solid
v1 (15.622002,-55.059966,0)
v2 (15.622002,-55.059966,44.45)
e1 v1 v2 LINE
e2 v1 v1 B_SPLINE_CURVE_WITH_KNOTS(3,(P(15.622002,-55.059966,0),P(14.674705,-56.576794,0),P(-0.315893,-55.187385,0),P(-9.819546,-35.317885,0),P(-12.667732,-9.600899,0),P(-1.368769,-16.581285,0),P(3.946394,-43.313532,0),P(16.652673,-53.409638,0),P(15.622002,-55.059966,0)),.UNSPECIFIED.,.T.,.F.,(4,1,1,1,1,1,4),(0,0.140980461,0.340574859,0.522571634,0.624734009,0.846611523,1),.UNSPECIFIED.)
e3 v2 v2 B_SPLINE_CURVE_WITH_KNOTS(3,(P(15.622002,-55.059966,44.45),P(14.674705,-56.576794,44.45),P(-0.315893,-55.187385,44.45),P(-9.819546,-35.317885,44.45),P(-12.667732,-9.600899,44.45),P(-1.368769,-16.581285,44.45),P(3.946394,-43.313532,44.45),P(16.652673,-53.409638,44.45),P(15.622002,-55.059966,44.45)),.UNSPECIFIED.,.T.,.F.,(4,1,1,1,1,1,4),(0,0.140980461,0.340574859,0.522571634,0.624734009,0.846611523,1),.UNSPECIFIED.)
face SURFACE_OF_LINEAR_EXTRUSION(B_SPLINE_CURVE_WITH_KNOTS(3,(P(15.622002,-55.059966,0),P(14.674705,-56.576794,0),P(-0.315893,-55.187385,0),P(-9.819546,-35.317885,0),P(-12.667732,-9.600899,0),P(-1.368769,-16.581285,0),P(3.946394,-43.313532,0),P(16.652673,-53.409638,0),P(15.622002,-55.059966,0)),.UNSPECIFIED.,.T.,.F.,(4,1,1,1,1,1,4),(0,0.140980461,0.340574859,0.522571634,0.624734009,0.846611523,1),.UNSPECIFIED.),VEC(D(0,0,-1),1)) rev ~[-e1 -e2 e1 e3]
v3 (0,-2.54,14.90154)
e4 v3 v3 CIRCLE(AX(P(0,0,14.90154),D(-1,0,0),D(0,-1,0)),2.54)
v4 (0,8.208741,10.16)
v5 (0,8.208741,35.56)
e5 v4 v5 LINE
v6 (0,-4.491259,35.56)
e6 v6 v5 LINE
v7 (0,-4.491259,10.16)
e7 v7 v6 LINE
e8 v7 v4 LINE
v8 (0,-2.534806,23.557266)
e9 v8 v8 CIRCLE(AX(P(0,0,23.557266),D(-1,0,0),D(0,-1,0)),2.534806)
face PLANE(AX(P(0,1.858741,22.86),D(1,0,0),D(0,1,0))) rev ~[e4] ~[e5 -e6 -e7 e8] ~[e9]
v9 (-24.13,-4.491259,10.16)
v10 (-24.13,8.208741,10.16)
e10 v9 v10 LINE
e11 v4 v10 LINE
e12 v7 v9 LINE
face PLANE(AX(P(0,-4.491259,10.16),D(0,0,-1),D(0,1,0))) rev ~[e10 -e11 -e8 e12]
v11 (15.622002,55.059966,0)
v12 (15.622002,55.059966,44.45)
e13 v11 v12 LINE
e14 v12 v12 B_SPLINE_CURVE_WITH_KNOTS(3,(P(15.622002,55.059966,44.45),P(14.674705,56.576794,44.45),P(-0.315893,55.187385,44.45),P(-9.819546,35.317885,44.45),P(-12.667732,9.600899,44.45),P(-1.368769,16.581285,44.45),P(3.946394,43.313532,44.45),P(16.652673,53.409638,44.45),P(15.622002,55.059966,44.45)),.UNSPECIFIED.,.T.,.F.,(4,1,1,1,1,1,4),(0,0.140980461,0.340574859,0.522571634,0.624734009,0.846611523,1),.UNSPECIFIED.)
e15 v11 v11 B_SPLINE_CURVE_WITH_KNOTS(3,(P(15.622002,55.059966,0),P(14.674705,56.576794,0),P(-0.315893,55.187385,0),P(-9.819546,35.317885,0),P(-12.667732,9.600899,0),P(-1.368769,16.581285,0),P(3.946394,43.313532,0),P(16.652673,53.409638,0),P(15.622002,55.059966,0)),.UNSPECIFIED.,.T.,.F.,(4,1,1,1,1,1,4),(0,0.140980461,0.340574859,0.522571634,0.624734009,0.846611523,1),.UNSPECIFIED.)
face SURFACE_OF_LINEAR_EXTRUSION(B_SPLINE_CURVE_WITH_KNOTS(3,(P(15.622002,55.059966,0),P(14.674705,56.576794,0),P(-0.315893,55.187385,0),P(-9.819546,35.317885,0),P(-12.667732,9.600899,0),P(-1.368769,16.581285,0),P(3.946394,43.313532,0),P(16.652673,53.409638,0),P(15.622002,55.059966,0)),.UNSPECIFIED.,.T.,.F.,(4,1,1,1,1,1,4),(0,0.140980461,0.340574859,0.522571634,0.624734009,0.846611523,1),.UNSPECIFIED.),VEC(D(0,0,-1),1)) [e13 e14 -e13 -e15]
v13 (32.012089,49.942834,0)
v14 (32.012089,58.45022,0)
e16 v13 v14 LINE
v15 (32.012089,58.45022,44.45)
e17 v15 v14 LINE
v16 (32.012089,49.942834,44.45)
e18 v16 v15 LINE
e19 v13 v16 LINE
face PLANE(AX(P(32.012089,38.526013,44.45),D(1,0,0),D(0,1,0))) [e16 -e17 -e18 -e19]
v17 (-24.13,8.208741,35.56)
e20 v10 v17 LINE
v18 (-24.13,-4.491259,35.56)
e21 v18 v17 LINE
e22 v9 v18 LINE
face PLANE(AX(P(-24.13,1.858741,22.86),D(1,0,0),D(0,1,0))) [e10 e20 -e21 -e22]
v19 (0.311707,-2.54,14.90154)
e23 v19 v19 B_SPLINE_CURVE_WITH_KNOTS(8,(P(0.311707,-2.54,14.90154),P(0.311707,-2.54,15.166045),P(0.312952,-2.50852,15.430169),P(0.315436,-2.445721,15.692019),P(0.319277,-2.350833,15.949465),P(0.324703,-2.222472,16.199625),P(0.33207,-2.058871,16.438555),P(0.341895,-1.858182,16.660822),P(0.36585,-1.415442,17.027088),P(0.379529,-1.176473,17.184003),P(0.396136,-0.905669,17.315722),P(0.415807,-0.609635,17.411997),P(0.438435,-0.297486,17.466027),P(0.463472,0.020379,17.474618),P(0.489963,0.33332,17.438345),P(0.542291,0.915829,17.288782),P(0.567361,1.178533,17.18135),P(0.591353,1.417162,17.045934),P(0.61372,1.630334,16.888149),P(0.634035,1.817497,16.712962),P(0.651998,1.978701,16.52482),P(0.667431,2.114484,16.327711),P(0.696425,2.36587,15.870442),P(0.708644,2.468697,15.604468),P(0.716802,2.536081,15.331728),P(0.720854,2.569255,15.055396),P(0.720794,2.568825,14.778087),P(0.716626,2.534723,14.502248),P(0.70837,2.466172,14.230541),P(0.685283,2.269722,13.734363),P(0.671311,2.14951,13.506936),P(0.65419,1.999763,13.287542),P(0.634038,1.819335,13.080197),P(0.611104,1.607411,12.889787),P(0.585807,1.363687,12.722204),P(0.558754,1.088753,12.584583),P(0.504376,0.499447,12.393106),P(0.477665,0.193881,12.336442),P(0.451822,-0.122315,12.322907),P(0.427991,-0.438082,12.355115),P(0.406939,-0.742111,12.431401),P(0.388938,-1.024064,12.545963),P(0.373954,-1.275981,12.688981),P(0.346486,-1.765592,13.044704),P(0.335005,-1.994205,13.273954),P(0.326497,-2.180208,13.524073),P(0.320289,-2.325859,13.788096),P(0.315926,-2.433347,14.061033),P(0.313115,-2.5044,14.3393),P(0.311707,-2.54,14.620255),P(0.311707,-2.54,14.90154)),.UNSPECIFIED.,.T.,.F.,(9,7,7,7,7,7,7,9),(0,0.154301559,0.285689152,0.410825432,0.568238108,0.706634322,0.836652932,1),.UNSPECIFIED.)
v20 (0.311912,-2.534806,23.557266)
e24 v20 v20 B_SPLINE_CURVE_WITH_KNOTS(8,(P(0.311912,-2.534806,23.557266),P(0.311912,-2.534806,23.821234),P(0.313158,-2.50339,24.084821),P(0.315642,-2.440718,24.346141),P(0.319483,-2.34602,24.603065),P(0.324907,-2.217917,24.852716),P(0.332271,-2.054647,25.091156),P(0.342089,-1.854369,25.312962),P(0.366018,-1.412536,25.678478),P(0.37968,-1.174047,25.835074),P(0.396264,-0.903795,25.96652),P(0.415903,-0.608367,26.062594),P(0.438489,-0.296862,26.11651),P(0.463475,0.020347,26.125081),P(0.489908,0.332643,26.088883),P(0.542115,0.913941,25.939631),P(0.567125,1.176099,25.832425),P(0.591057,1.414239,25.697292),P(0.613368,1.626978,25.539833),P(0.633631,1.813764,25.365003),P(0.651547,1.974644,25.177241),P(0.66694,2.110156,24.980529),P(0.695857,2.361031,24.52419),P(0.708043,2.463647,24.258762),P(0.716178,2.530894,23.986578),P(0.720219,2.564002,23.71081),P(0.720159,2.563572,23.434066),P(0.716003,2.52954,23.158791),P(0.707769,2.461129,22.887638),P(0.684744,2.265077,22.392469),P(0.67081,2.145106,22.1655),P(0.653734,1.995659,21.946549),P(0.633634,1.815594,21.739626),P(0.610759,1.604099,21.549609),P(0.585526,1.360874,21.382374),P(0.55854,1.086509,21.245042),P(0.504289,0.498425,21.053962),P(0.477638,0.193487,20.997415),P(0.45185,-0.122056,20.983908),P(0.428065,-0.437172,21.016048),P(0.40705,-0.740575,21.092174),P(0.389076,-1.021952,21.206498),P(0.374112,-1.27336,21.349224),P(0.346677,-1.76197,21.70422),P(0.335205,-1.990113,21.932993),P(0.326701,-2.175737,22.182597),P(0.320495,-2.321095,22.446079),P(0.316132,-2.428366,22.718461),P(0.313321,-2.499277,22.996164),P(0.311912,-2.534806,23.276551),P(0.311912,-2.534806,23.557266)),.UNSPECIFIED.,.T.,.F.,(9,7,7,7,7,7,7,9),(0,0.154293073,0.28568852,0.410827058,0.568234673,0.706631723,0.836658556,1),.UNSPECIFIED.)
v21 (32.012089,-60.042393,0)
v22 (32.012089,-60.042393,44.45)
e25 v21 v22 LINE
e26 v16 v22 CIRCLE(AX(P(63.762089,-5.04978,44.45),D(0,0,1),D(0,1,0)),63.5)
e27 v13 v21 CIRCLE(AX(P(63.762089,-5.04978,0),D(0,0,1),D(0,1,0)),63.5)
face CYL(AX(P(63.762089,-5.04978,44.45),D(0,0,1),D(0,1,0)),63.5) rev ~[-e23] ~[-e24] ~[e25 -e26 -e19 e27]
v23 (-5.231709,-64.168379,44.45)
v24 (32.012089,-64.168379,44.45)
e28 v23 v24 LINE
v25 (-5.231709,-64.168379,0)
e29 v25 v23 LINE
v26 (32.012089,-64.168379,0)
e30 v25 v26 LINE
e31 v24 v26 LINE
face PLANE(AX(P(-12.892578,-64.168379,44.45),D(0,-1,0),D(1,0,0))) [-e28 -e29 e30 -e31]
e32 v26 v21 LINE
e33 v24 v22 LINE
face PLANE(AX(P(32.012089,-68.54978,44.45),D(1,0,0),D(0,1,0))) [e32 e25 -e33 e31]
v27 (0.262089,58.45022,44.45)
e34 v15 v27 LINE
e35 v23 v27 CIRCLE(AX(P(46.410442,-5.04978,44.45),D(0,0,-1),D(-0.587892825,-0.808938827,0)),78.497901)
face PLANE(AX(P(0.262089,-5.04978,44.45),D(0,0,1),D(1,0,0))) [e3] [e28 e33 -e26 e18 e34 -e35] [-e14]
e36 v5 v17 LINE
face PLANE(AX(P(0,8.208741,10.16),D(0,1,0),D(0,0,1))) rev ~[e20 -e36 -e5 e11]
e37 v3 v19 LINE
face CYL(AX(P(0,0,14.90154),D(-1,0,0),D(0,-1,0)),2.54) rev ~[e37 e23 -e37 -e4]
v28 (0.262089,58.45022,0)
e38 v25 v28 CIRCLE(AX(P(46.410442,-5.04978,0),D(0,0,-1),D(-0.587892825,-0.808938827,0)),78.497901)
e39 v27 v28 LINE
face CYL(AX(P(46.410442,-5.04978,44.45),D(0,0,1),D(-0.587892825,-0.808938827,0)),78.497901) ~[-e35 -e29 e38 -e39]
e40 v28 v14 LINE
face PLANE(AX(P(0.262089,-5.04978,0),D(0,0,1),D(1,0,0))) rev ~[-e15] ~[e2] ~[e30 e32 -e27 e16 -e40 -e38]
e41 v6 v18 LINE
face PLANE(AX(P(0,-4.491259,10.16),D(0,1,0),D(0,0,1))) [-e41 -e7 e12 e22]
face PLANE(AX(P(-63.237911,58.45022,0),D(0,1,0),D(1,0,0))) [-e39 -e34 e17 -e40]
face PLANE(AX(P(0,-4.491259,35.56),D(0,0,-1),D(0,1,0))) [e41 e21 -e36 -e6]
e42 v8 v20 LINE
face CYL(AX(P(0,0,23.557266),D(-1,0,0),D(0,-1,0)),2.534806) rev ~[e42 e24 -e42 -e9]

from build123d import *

# Parameters (mm, degrees)
F0_W      = 127
F0_H      = 127
F1_DEPTH  = 44.45
F3_DEPTH  = 44.45
F5_DEPTH  = 44.45
F7_DEPTH  = 46.06675
F8_W      = 32.0189083815
F8_H      = 8.9123969463
F9_DEPTH  = 44.45
F10_W     = 31.75
F10_H     = 19.9242069336
F11_DEPTH = 44.45
F12_W     = 12.7
F12_H     = 25.4
F13_DEPTH = 24.13
F14_R     = 2.54
F14_R_2   = 2.5348059879
F15_DEPTH = 25.4
F17_DEPTH = 44.45
F18_W     = 44.9046668708
F18_H     = 4.3814008621
F19_DEPTH = 44.45
F20_DEPTH = 25


with BuildPart() as f1:
    # F0 (on Top) → F1 (new body)
    with BuildSketch(Plane.XY):
        with Locations((0.2620890737, -5.0497795728)):
            Rectangle(F0_W, F0_H)
    extrude(amount=F1_DEPTH)

    # F2 (on face) → F3 (cut, through all)
    with BuildSketch(Plane.XY.offset(44.45)):
        with BuildLine():
            Line((0.2620890737, 58.4502204272), (-63.2379109263, 58.4502204272))
            Line((-63.2379109263, 58.4502204272), (-63.2379109263, -68.5497795728))
            Line((-63.2379109263, -68.5497795728), (0.2620890737, -68.5497795728))
            ThreePointArc((0.2620890737, -68.5497795728), (-32.0874591554, -5.0497795728), (0.2620890737, 58.4502204272))
        make_face()
    extrude(amount=-F3_DEPTH, mode=Mode.SUBTRACT)

    # F4 (on face) → F5 (cut, through all)
    with BuildSketch(Plane.XY.offset(44.45)):
        with BuildLine():
            Line((63.7620890737, -68.5497795728), (63.7620890737, 58.4502204272))
            ThreePointArc((63.7620890737, 58.4502204272), (0.2620890737, -5.0497795728), (63.7620890737, -68.5497795728))
        make_face()
    extrude(amount=-F5_DEPTH, mode=Mode.SUBTRACT)

    # F6 (on face) → F7 (cut)
    with BuildSketch(Plane.XY.offset(44.45)):
        with BuildLine():
            Line((45.0293794274, -68.5497795728), (45.0293794274, -99.4110107422))
            Line((45.0293794274, -99.4110107422), (83.5961028934, -99.4110107422))
            Line((83.5961028934, -99.4110107422), (83.5961028934, 124.6481090784))
            Line((83.5961028934, 124.6481090784), (45.0293794274, 124.6481090784))
            Line((45.0293794274, 124.6481090784), (45.0293794274, 58.4502204272))
            Line((45.0293794274, 58.4502204272), (63.7620890737, 58.4502204272))
            ThreePointArc((63.7620890737, 58.4502204272), (54.2897526998, 57.7397485638), (45.0293794274, 55.6242312498))
            Line((45.0293794274, 55.6242312498), (45.0293794274, -65.7237903955))
            ThreePointArc((45.0293794274, -65.7237903955), (54.2897526998, -67.8393077095), (63.7620890737, -68.5497795728))
            Line((63.7620890737, -68.5497795728), (45.0293794274, -68.5497795728))
        make_face()
    extrude(amount=-F7_DEPTH, mode=Mode.SUBTRACT)

    # F8 (on face) → F9 (cut, through all)
    with BuildSketch(Plane.XY.offset(44.45)):
        with Locations((48.0215432644, -64.0935810997)):
            Rectangle(F8_W, F8_H)
    extrude(amount=-F9_DEPTH, mode=Mode.SUBTRACT)

    # F10 (on face) → F11 (cut, through all)
    with BuildSketch(Plane.XY.offset(44.45)):
        with Locations((47.8870890737, 48.4881169604)):
            Rectangle(F10_W, F10_H)
    extrude(amount=-F11_DEPTH, mode=Mode.SUBTRACT)

    # F12 (on Right) → F13 (cut)
    with BuildSketch(Plane.YZ):
        with Locations((1.8587405793, 22.86)):
            Rectangle(F12_W, F12_H)
    extrude(amount=-F13_DEPTH, mode=Mode.SUBTRACT)

    # F14 (on face) → F15 (cut)
    with BuildSketch(Plane(origin=(0, 0, 0), x_dir=(0, -1, 0), z_dir=(-1, 0, 0))):
        with Locations((0, 14.9015395448)):
            Circle(F14_R)
        with Locations((0, 23.5572663476)):
            Circle(F14_R_2)
    extrude(amount=-F15_DEPTH, mode=Mode.SUBTRACT)

    # F16 (on face) → F17 (cut, through all)
    with BuildSketch(Plane(origin=(0, 0, 0), x_dir=(1, 0, 0), z_dir=(0, 0, -1))):
        with BuildLine():
            add(Edge.make_bspline(
                [(15.6220020726, -55.0599656999), (14.6747045844, -56.5767938839), (-0.3158932357, -55.1873853804), (-9.8195458276, -35.317884945), (-12.6677317866, -9.6008985203), (-1.3687691608, -16.5812854446), (3.9463942773, -43.3135324972), (16.6526734024, -53.4096379614), (15.6220020726, -55.0599656999)],
                knots=[0, 0, 0, 0, 0.1409804606, 0.3405748592, 0.522571634, 0.6247340088, 0.8466115232, 1, 1, 1, 1], degree=3))
        make_face()
        with BuildLine():
            add(Edge.make_bspline(
                [(15.6220020726, 55.0599656999), (14.6747045844, 56.5767938839), (-0.3158932357, 55.1873853804), (-9.8195458276, 35.317884945), (-12.6677317866, 9.6008985203), (-1.3687691608, 16.5812854446), (3.9463942773, 43.3135324972), (16.6526734024, 53.4096379614), (15.6220020726, 55.0599656999)],
                knots=[0, 0, 0, 0, 0.1409804606, 0.3405748592, 0.522571634, 0.6247340088, 0.8466115232, 1, 1, 1, 1], degree=3))
        make_face()
    extrude(amount=-F17_DEPTH, mode=Mode.SUBTRACT)

    # F18 (on face) → F19 (cut, through all)
    with BuildSketch(Plane.XY.offset(44.45)):
        with Locations((9.5597556382, -66.3590791418)):
            Rectangle(F18_W, F18_H)
    extrude(amount=-F19_DEPTH, mode=Mode.SUBTRACT)

    # F2 (on face) → F20 (cut)
    with BuildSketch(Plane.XY.offset(44.45)):
        with BuildLine():
            Line((0.2620890737, 58.4502204272), (-63.2379109263, 58.4502204272))
            Line((-63.2379109263, 58.4502204272), (-63.2379109263, -68.5497795728))
            Line((-63.2379109263, -68.5497795728), (0.2620890737, -68.5497795728))
            ThreePointArc((0.2620890737, -68.5497795728), (-32.0874591554, -5.0497795728), (0.2620890737, 58.4502204272))
        make_face()
    extrude(amount=-F20_DEPTH, mode=Mode.SUBTRACT)


solid = f1.part
